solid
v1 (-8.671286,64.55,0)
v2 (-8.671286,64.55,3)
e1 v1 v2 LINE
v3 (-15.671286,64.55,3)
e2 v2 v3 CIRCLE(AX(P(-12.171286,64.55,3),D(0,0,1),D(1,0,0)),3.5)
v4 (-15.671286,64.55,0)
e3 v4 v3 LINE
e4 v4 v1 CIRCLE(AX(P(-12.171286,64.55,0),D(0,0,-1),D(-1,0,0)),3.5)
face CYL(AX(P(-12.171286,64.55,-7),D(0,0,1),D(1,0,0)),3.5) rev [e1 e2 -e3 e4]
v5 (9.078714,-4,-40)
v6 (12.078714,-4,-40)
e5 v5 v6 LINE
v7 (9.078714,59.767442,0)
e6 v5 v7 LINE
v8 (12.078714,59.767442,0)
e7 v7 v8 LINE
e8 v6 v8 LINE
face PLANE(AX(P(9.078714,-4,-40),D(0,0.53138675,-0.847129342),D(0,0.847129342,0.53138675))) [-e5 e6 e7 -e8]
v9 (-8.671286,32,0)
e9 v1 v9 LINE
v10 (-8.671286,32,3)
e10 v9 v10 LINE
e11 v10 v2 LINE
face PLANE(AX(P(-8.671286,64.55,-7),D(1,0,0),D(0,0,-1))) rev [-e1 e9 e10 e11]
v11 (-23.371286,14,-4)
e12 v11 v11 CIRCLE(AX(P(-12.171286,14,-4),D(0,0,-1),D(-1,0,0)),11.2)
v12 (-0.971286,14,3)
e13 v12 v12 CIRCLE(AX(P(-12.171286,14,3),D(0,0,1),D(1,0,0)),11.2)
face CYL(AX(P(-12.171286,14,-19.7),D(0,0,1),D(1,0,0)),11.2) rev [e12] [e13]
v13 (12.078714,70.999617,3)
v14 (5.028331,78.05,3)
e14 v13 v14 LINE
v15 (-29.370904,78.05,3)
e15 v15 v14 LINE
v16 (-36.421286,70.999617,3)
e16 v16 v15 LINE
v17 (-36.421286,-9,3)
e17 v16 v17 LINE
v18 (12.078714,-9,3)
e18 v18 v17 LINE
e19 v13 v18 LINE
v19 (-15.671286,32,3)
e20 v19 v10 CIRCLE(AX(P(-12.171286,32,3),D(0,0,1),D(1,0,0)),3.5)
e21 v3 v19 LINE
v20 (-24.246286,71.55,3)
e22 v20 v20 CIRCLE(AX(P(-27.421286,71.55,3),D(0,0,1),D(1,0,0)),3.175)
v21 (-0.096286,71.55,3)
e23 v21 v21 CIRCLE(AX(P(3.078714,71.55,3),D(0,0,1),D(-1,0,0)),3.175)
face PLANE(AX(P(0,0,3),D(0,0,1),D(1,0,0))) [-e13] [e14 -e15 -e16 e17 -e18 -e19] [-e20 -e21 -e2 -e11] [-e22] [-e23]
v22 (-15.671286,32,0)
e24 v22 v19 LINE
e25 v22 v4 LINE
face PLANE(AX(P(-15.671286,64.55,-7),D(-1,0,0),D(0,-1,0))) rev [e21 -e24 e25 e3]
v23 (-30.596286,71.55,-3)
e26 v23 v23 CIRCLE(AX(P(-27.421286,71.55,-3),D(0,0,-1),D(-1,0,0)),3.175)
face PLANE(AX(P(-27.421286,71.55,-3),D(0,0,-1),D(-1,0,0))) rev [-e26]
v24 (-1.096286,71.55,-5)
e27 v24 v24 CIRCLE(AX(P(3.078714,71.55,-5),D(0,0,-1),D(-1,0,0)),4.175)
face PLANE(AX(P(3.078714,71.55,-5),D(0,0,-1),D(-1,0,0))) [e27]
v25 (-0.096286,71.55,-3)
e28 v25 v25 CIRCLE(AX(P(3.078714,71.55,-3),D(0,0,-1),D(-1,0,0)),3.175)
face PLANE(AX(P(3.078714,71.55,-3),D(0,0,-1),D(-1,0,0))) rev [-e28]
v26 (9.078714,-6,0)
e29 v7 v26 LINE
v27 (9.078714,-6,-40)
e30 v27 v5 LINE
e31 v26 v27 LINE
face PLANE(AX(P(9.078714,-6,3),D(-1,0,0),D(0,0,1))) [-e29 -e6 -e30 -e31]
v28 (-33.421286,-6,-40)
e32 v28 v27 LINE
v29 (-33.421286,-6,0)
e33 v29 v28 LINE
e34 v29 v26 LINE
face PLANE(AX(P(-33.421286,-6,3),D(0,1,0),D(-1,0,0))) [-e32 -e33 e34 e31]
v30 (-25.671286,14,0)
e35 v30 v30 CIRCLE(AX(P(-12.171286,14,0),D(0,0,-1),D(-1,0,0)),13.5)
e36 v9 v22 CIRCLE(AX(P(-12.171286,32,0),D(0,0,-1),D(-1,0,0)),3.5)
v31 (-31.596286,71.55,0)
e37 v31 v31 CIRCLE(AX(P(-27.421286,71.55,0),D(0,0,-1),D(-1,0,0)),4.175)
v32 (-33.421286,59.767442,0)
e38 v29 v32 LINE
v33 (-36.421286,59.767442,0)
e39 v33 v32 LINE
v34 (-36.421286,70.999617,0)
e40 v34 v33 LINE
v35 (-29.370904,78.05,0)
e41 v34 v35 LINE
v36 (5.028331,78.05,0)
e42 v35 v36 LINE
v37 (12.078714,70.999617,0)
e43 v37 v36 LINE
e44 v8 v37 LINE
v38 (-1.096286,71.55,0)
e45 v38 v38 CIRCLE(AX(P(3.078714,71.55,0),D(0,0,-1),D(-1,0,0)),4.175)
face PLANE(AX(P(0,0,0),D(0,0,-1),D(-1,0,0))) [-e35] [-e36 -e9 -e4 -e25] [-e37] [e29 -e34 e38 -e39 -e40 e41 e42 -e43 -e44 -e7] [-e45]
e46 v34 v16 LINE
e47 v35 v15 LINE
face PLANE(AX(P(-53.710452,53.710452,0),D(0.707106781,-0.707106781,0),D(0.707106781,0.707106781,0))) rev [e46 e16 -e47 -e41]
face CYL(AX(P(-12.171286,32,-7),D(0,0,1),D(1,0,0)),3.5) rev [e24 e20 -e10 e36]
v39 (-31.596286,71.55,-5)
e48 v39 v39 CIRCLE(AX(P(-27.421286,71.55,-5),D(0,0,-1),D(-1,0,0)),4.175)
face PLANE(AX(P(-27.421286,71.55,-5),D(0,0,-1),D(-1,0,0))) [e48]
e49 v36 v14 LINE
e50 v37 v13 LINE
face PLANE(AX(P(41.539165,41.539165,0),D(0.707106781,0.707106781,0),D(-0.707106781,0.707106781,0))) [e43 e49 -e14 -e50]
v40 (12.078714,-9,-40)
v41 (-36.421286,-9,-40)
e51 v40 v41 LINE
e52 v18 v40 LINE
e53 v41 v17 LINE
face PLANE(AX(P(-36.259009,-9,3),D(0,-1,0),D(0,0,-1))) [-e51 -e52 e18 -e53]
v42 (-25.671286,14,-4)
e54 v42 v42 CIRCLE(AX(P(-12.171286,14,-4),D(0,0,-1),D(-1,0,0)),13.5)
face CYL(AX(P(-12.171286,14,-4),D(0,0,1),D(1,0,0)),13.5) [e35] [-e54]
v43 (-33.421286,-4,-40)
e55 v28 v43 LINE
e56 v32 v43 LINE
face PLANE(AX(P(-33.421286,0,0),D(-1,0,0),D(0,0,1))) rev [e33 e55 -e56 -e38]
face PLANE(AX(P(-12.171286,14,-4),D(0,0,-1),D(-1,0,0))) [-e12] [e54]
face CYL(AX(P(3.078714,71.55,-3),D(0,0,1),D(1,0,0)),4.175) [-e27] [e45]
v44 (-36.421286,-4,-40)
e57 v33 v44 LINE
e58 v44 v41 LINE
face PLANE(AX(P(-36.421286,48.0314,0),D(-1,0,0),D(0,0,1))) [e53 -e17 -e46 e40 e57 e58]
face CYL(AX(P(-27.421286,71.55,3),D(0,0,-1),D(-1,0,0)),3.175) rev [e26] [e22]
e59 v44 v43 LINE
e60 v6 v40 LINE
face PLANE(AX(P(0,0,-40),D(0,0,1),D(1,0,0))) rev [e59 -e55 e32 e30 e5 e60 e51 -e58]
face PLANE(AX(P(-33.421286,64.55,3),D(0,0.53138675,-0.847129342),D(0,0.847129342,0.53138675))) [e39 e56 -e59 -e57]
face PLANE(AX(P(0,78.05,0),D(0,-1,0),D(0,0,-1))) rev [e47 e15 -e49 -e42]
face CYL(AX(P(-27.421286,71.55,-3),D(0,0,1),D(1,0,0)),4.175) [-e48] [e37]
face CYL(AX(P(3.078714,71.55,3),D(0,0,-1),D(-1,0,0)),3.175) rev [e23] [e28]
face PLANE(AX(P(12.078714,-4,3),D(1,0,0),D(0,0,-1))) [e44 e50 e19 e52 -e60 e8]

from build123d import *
from OCP.BRepFilletAPI import BRepFilletAPI_MakeChamfer
from build123d.topology import SkipClean

# Parameters (mm, degrees)
SKETCH1_R                = 1.55
SKETCH1_R_2              = 1.5
SKETCH1_R_3              = 11
SKETCH1_R_4              = 3.175
BOSS_EXTRUDE1_DEPTH      = 3
BOSS_EXTRUDE2_START      = 3
SKETCH2_R                = 4.175
SKETCH2_R_2              = 3.175
BOSS_EXTRUDE2_DEPTH      = 3
BOSS_EXTRUDE3_START      = 2
SKETCH3_R                = 4.175
BOSS_EXTRUDE3_DEPTH      = 2
BOSS_EXTRUDE4_DEPTH      = 40
BOSS_EXTRUDE4_DEPTH_BACK = 3
SKETCH5_W                = 3
SKETCH5_H                = 5
BOSS_EXTRUDE5_DEPTH      = 3
BOSS_EXTRUDE7_DEPTH      = 3
BOSS_EXTRUDE9_DEPTH      = 3
BOSS_EXTRUDE10_START     = -3
SKETCH9_R                = 1.55
SKETCH9_R_2              = 1.5
SKETCH9_R_3              = 11
BOSS_EXTRUDE10_DEPTH     = 3
SKETCH10_R               = 11.2
CUT_EXTRUDE1_DEPTH       = 22.7
CUT_EXTRUDE2_DEPTH       = 10
SKETCH12_R               = 13.5
SKETCH12_R_2             = 11.2
BOSS_EXTRUDE11_DEPTH     = 4
SKETCH13_W               = 3
SKETCH13_H               = 76.55
BOSS_EXTRUDE13_DEPTH     = 3
BOSS_EXTRUDE14_DEPTH     = 3
BOSS_EXTRUDE15_DEPTH     = 3
SKETCH16_W               = 0.497079972
SKETCH16_H               = 40
CUT_EXTRUDE3_DEPTH       = 2
CHAMFER1_SIZE            = 3
CHAMFER1_SIZE_2          = 2.99439091
BOSS_EXTRUDE17_DEPTH     = 3


with BuildPart() as part:
    # Sketch1 → Boss-Extrude1 (new body)
    with BuildSketch(Plane.XY):
        Polygon((-33.421286346, -6), (-33.421286346, 36.5), (-33.421286346, 72.55), (-28.421286346, 77.55), (4.078713654, 77.55), (9.078713654, 72.55), (9.078713654, 36.5), (9.078713654, -6), align=None)
        with Locations((2.92772434, 30.5)):
            Circle(SKETCH1_R, mode=Mode.SUBTRACT)
        with Locations(Location((2.92772434, -0.5, 0), (0, 0, 180))):
            Circle(SKETCH1_R_2, mode=Mode.SUBTRACT)
        with Locations((-27.671286346, -0.5)):
            Circle(SKETCH1_R_2, mode=Mode.SUBTRACT)
        with Locations(Location((-28.07227566, 30.5, 0), (0, 0, 180))):
            Circle(SKETCH1_R_2, mode=Mode.SUBTRACT)
        with Locations((-12.171286346, 15.25)):
            Circle(SKETCH1_R_3, mode=Mode.SUBTRACT)
        with Locations((-27.421286346, 71.55)):
            Circle(SKETCH1_R_4, mode=Mode.SUBTRACT)
        with Locations(Location((3.078713654, 71.55, 0), (0, 0, 180))):
            Circle(SKETCH1_R_4, mode=Mode.SUBTRACT)
    extrude(amount=BOSS_EXTRUDE1_DEPTH)

    # Sketch2 → Boss-Extrude2 (add)
    # profile 1 of 2: a face of its own
    with SkipClean():  # the faces are left unmerged after this step: merging them gives an invalid solid
        with BuildSketch(Plane(origin=(0, 0, 0), x_dir=(-1, 0, 0), z_dir=(0, 0, -1)).offset(BOSS_EXTRUDE2_START)):
            with Locations((-3.078713654, 71.55)):
                Circle(SKETCH2_R)
            with Locations((-3.078713654, 71.55)):
                Circle(SKETCH2_R_2, mode=Mode.SUBTRACT)
        # profile 2 of 2: a face of its own
        with BuildSketch(Plane(origin=(0, 0, 0), x_dir=(-1, 0, 0), z_dir=(0, 0, -1)).offset(BOSS_EXTRUDE2_START)):
            with Locations((27.421286346, 71.55)):
                Circle(SKETCH2_R)
            with Locations((27.421286346, 71.55)):
                Circle(SKETCH2_R_2, mode=Mode.SUBTRACT)
        extrude(amount=-BOSS_EXTRUDE2_DEPTH)

    # Sketch3 → Boss-Extrude3 (add)
    with SkipClean():  # the faces are left unmerged after this step: merging them gives an invalid solid
        with BuildSketch(Plane(origin=(0, 0, -3), x_dir=(-1, 0, 0), z_dir=(0, 0, -1)).offset(BOSS_EXTRUDE3_START)):
            with Locations((-3.078713654, 71.55)):
                Circle(SKETCH3_R)
            with Locations((27.421286346, 71.55)):
                Circle(SKETCH3_R)
        extrude(amount=-BOSS_EXTRUDE3_DEPTH)

    # Sketch5 → Boss-Extrude5 (add)
    with SkipClean():  # the faces are left unmerged after this step: merging them gives an invalid solid
        with BuildSketch(Plane.XY.offset(3)):
            with Locations((10.578713654, 45.531399611)):
                Rectangle(SKETCH5_W, SKETCH5_H)
            with Locations((-34.921286346, 45.531399611)):
                Rectangle(SKETCH5_W, SKETCH5_H)
        extrude(amount=-BOSS_EXTRUDE5_DEPTH)



with BuildPart() as body_2:
    # Sketch4 → Boss-Extrude4 (new, two sides: drawn at the far end of the back side and taken through both)
    with BuildSketch(Plane(origin=(0, 0, 0), x_dir=(-1, 0, 0), z_dir=(0, 0, -1)).offset(-BOSS_EXTRUDE4_DEPTH_BACK)):
        Polygon((33.421286346, -6), (-9.078713654, -6), (-9.078713654, -4), (-12.078713654, -4), (-12.078713654, -9), (-9.078713654, -9), (33.259008686, -9), (36.259008686, -9), (36.259008686, -4), (33.259008686, -4), align=None)
    extrude(amount=BOSS_EXTRUDE4_DEPTH + BOSS_EXTRUDE4_DEPTH_BACK)


with BuildPart() as part_1:
    with SkipClean():  # the faces are left unmerged after this step: merging them gives an invalid solid
        add(part.part)

        add(body_2.part)  # Boss-Extrude7 merges body 2
        # Sketch6 → Boss-Extrude7 (add)
        with BuildSketch(Plane(origin=(9.078713654, 0, 0), x_dir=(0, 0, -1), z_dir=(1, 0, 0))):
            Polygon((0, 48.031399611), (40, -4), (36.156167209, -4), (0, 43.031399611), align=None)
        extrude(amount=BOSS_EXTRUDE7_DEPTH)

    # Sketch8 → Boss-Extrude9 (add)
    with BuildSketch(Plane.ZY.offset(36.421286346)):
        Polygon((0, 48.031399611), (0, 43.031399611), (-36.156167209, -4), (-40, -4), align=None)
    extrude(amount=-BOSS_EXTRUDE9_DEPTH)

    # Sketch9 → Boss-Extrude10 (add)
    with BuildSketch(Plane.XY.offset(3).offset(BOSS_EXTRUDE10_START)):
        with Locations((2.92772434, 30.5)):
            Circle(SKETCH9_R)
        with Locations((-28.07227566, 30.5)):
            Circle(SKETCH9_R_2)
        with Locations((-27.671286346, -0.5)):
            Circle(SKETCH9_R_2)
        with Locations((2.92772434, -0.5)):
            Circle(SKETCH9_R_2)
        with Locations((-12.171286346, 15.25)):
            Circle(SKETCH9_R_3)
    extrude(amount=BOSS_EXTRUDE10_DEPTH)

    # Sketch10 → Cut-Extrude1 (cut)
    with BuildSketch(Plane.XY.offset(3)):
        with Locations((-12.171286346, 14)):
            Circle(SKETCH10_R)
    extrude(amount=-CUT_EXTRUDE1_DEPTH, mode=Mode.SUBTRACT)

    # Sketch11 → Cut-Extrude2 (cut)
    with BuildSketch(Plane.XY.offset(3)):
        with BuildLine():
            Line((-8.671286346, 64.55), (-8.671286346, 32))
            ThreePointArc((-8.671286346, 32), (-12.171286346, 28.5), (-15.671286346, 32))
            Line((-15.671286346, 32), (-15.671286346, 64.55))
            ThreePointArc((-15.671286346, 64.55), (-12.171286346, 68.05), (-8.671286346, 64.55))
        make_face()
    extrude(amount=-CUT_EXTRUDE2_DEPTH, mode=Mode.SUBTRACT)

    # Sketch12 → Boss-Extrude11 (add)
    with BuildSketch(Plane(origin=(0, 0, 0), x_dir=(-1, 0, 0), z_dir=(0, 0, -1))):
        with Locations((12.171286346, 14)):
            Circle(SKETCH12_R)
        with Locations(Location((12.171286346, 14, 0), (0, 0, 180))):
            Circle(SKETCH12_R_2, mode=Mode.SUBTRACT)
    extrude(amount=BOSS_EXTRUDE11_DEPTH)

    # Sketch13 → Boss-Extrude13 (add)
    with BuildSketch(Plane.XY.offset(3)):
        with Locations((-34.921286346, 34.275)):
            Rectangle(SKETCH13_W, SKETCH13_H)
        Polygon((12.078713654, -4), (9.078713654, -4), (9.078713654, 72.55), (12.078713654, 72.555624881), align=None)
    extrude(amount=-BOSS_EXTRUDE13_DEPTH)

    # Sketch14 → Boss-Extrude14 (add)
    with BuildSketch(Plane(origin=(12.078713654, 0, 0), x_dir=(0, 0, -1), z_dir=(1, 0, 0))):
        Polygon((-3, 64.55), (-3, -9), (40, -9), (40, -4), align=None)
    extrude(amount=-BOSS_EXTRUDE14_DEPTH)

    # Sketch15 → Boss-Extrude15 (add)
    with BuildSketch(Plane.ZY.offset(36.421286346)):
        Polygon((3, 64.55), (-40, -4), (-40, -9), (3, -9), align=None)
    extrude(amount=-BOSS_EXTRUDE15_DEPTH)

    # Sketch16 → Cut-Extrude3 (cut)
    with BuildSketch(Plane(origin=(0, -4, 0), x_dir=(1, 0, 0), z_dir=(0, 1, 0))):
        with Locations((-33.17274636, 20)):
            Rectangle(SKETCH16_W, SKETCH16_H)
    extrude(amount=-CUT_EXTRUDE3_DEPTH, mode=Mode.SUBTRACT)

    # Chamfer1
    chamfer1_edges_1 = [part_1.edges().sort_by_distance(p)[0] for p in [
        (-36.421286346, 72.55, 1.5),
    ]]
    chamfer1_edges_2 = [part_1.edges().sort_by_distance(p)[0] for p in [
        (12.078713654, 72.555624881, 1.5),
    ]]
    chamfer1_side_2 = [part_1.faces().sort_by_distance(p)[0] for p in [
        (12.018825941, 72.555512593, 1.5),
    ]]
    chamfer1 = BRepFilletAPI_MakeChamfer(part_1.part.solid().wrapped)
    for e in chamfer1_edges_1:
        chamfer1.Add(CHAMFER1_SIZE - 0.0001, e.wrapped)
    for e in chamfer1_edges_2:
        chamfer1.Add(CHAMFER1_SIZE - 0.0001, CHAMFER1_SIZE_2 - 0.0001, e.wrapped, chamfer1_side_2[0].wrapped)
    add(Compound.cast(chamfer1.Shape()), mode=Mode.REPLACE)  # a hair under: the kernel refuses the full size

    # Sketch17 → Boss-Extrude17 (add)
    with BuildSketch(Plane.XY.offset(3)):
        Polygon((-33.421286346, 72.55), (-28.421286346, 77.55), (-12.171286346, 77.55), (-12.171286346, 78.05), (-29.370903561, 78.05), (-36.421286346, 70.999617215), (-36.421286346, 69.55), align=None)
        Polygon((-12.171286346, 78.05), (-12.171286346, 77.55), (4.078713654, 77.55), (9.078713654, 72.55), (12.078713654, 69.561233971), (12.078713654, 70.999617215), (5.028330869, 78.05), align=None)
    extrude(amount=-BOSS_EXTRUDE17_DEPTH)


solid = part_1.part
